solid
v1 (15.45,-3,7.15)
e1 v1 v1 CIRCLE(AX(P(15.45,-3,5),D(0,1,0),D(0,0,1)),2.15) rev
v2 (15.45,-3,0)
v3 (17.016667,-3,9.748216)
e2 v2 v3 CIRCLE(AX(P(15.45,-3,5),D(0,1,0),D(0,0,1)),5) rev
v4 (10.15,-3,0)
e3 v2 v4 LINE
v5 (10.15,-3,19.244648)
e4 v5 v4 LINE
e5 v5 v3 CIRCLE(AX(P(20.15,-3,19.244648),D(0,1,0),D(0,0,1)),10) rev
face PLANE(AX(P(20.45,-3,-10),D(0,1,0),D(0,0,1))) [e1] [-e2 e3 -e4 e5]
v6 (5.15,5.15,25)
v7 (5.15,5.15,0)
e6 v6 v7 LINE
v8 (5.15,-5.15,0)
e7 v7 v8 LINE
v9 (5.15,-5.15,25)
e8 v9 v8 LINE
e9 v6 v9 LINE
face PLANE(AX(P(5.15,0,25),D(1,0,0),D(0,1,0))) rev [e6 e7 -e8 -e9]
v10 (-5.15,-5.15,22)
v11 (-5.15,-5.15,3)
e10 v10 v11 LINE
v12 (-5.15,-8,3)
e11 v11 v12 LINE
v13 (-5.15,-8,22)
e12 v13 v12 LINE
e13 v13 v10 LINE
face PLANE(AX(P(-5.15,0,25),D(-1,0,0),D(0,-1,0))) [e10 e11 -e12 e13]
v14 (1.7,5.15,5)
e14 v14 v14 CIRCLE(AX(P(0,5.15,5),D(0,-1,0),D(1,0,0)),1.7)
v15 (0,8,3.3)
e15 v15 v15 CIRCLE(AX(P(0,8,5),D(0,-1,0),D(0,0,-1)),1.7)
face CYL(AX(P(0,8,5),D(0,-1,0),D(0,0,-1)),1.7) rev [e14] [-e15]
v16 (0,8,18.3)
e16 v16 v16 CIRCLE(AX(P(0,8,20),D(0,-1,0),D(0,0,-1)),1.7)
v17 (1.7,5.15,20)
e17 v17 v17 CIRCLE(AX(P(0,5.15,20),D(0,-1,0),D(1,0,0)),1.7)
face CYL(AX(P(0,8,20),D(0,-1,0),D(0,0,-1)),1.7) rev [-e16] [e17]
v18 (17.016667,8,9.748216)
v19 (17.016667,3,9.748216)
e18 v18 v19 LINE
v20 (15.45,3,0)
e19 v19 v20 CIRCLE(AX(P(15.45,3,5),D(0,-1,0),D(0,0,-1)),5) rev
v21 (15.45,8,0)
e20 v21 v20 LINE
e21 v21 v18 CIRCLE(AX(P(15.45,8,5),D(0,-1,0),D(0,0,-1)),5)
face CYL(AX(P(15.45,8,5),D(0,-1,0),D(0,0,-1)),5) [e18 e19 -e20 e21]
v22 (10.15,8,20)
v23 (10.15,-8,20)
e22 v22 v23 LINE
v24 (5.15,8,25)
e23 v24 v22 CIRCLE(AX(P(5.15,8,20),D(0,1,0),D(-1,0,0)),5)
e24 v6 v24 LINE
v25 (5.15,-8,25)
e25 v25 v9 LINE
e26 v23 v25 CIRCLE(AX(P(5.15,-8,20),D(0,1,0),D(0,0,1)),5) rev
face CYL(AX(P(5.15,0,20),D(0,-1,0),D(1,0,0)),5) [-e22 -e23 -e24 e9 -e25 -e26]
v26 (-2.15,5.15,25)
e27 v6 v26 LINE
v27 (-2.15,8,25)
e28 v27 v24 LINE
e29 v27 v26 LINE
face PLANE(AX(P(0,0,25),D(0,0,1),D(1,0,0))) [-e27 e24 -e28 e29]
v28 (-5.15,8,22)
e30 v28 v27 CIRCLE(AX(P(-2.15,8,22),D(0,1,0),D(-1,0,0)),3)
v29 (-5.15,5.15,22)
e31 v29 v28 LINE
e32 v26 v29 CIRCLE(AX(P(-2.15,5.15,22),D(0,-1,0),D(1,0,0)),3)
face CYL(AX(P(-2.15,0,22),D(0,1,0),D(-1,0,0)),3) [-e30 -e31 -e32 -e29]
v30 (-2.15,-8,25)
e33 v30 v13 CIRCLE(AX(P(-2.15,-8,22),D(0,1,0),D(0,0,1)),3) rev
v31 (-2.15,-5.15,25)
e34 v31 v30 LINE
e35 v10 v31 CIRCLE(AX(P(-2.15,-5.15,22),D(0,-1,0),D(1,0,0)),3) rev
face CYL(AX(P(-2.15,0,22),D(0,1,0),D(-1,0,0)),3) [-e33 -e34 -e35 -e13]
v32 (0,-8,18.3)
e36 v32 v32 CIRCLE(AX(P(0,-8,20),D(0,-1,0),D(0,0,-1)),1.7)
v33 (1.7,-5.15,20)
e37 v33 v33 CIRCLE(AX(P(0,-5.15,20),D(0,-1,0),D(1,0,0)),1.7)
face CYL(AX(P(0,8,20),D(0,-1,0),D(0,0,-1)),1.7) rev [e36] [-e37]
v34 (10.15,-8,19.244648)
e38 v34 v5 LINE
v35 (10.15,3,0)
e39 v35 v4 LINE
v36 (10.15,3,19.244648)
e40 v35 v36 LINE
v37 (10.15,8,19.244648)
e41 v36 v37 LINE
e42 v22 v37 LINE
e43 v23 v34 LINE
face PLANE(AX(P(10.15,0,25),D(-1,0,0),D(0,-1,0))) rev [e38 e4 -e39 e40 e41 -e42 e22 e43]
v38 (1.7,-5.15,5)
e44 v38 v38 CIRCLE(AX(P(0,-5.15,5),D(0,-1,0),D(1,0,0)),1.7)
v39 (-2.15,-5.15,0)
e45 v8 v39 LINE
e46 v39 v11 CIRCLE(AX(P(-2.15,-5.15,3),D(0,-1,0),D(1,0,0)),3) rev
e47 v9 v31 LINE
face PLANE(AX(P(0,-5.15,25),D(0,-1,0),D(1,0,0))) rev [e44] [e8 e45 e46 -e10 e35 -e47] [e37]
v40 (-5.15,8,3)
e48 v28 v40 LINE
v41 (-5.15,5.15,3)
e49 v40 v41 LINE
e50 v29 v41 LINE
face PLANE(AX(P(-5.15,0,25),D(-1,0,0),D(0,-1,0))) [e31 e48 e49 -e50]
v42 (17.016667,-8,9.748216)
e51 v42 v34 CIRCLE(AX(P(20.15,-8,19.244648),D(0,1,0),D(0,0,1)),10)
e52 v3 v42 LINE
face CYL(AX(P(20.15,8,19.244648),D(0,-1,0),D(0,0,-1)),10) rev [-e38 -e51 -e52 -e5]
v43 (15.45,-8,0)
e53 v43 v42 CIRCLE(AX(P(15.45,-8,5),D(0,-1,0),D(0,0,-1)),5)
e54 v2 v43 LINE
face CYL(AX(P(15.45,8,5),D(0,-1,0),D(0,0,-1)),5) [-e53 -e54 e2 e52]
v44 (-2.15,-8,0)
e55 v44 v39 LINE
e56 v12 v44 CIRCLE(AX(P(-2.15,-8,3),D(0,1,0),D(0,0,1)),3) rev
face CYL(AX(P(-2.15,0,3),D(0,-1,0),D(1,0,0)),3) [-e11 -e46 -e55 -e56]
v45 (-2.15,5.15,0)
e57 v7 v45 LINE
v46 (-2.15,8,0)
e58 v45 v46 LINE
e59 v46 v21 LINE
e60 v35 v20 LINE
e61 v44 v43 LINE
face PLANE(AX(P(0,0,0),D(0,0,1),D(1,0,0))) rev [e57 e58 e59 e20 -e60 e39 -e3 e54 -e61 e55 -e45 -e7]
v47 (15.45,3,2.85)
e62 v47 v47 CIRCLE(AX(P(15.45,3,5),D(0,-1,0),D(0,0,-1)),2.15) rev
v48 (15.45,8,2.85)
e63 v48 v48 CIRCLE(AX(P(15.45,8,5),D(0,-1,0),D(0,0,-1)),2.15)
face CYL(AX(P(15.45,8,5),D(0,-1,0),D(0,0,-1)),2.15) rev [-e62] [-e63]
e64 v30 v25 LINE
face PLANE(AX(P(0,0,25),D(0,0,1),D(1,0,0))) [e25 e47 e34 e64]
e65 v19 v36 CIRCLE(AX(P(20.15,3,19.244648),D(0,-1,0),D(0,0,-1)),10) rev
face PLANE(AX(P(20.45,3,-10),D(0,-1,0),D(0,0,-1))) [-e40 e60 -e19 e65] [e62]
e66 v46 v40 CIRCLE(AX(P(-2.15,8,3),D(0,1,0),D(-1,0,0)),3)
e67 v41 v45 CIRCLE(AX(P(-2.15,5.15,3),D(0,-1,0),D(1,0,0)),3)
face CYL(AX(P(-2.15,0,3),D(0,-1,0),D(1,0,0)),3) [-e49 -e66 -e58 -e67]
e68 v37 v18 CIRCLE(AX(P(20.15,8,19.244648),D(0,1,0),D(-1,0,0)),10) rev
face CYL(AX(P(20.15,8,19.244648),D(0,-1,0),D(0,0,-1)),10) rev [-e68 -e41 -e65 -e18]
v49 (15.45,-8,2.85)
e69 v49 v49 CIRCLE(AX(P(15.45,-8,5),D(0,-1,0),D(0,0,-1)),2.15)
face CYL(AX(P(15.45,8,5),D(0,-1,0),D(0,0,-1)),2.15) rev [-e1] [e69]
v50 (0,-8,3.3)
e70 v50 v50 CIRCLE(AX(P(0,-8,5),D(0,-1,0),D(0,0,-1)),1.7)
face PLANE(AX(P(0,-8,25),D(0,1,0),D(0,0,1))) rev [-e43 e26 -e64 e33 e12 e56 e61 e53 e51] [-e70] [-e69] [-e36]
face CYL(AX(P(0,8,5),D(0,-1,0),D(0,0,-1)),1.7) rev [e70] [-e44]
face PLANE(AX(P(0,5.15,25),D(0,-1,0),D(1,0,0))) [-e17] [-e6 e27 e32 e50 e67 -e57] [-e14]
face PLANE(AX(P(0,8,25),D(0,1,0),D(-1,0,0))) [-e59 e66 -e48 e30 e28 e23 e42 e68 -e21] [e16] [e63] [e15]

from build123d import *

# Parameters (mm, degrees)
EXTRUDE_1_DEPTH     = 25
SKETCH_2_R          = 1.7
CUT_EXTRUDE_1_DEPTH = 32.369132918
SKETCH_3_R          = 2.15
EXTRUDE_2_DEPTH     = 16
SKETCH_4_W          = 20
SKETCH_4_H          = 6
CUT_EXTRUDE_2_DEPTH = 31.382396219
FILLET_1_R          = 10
FILLET_2_R          = 5
FILLET_3_R          = 3


# Some blends are built 0.0001 mm under size
with BuildPart() as part:
    # ｽｹｯﾁ1 → ﾎﾞｽ - 押し出し1 (new body)
    with BuildSketch(Plane.XY):
        Polygon((5.15, 0), (10.15, 0), (10.15, 8), (-5.15, 8), (-5.15, 5.15), (5.15, 5.15), align=None)
        Polygon((10.15, -8), (10.15, 0), (5.15, 0), (5.15, -5.15), (-5.15, -5.15), (-5.15, -8), align=None)
    extrude(amount=EXTRUDE_1_DEPTH)

    # ｽｹｯﾁ2 → ｶｯﾄ - 押し出し1 (cut, through all)
    with BuildSketch(Plane.XZ.offset(8)):
        with Locations(Location((0, 20, 0), (0, 0, 270))):
            Circle(SKETCH_2_R)
        with Locations(Location((0, 5, 0), (0, 0, 270))):
            Circle(SKETCH_2_R)
    extrude(amount=-CUT_EXTRUDE_1_DEPTH, mode=Mode.SUBTRACT)

    # ｽｹｯﾁ3 → ﾎﾞｽ - 押し出し2 (add, through all)
    with BuildSketch(Plane.XZ.offset(8)):
        with BuildLine():
            Line((10.15, 0), (15.45, 0))
            ThreePointArc((15.45, 0), (20.45, 5), (15.45, 10))
            Line((15.45, 10), (10.15, 10))
            Line((10.15, 10), (10.15, 0))
        make_face()
        with Locations(Location((15.45, 5, 0), (0, 0, 270))):
            Circle(SKETCH_3_R, mode=Mode.SUBTRACT)
    extrude(amount=-EXTRUDE_2_DEPTH)

    # ｽｹｯﾁ4 → ｶｯﾄ - 押し出し2 (cut, through all)
    with BuildSketch(Plane(origin=(10.15, 0, 0), x_dir=(0, 0, -1), z_dir=(1, 0, 0))):
        Rectangle(SKETCH_4_W, SKETCH_4_H)
    extrude(amount=CUT_EXTRUDE_2_DEPTH, mode=Mode.SUBTRACT)

    # ﾌｨﾚｯﾄ1
    # the kernel refuses this fillet: 10 mm, written as the material it adds along each edge
    with BuildSketch(Plane(origin=(10.15, -8, 10), x_dir=(0, 0, 1), z_dir=(0, 1, 0)), Plane(origin=(10.15, 3, 10), x_dir=(0, 0, 1), z_dir=(0, 1, 0))) as fillet_1_piece_1:
        with BuildLine():
            CenterArc((9.244648118, 10), FILLET_1_R, 198.260227933, 71.739772067)
            Line((-0.251783961, 6.866666667), (-1.201427169, 6.553333333))
            ThreePointArc((-1.201427169, 6.553333333), (-1, 5.3), (-1, 0))
            Line((-1, 0), (0, -1))
            Line((0, -1), (9.244648118, -1))
            Line((9.244648118, -1), (9.244648118, 0))
        make_face()
    extrude(amount=5)
    with BuildSketch(Plane(origin=(10.15, -8, 10), x_dir=(0, 0, 1), z_dir=(0, 1, 0))) as fillet_1_piece_2_section:
        with BuildLine():
            CenterArc((9.244648118, 10), FILLET_1_R, 198.260227933, 71.739772067)
            Line((-0.251783961, 6.866666667), (-1.201427169, 6.553333333))
            ThreePointArc((-1.201427169, 6.553333333), (-1, 5.3), (-1, 0))
            Line((-1, 0), (0, -1))
            Line((0, -1), (9.244648118, -1))
            Line((9.244648118, -1), (9.244648118, 0))
        make_face()
    fillet_1_piece_2 = extrude(amount=28.111620295, mode=Mode.PRIVATE)
    fillet_1_piece_2 = split(fillet_1_piece_2, bisect_by=Plane(origin=(11.517519747, 8, 12.315903655), z_dir=(0, -1, 0)), keep=Keep.TOP, mode=Mode.PRIVATE)
    fillet_1_piece_2 = split(fillet_1_piece_2, bisect_by=Plane(origin=(11.517519747, 3, 12.315903655), z_dir=(0, 1, 0)), keep=Keep.TOP, mode=Mode.PRIVATE)
    add(fillet_1_piece_2)
    with BuildSketch(Plane(origin=(10.15, -20.111620295, 10), x_dir=(0, 0, 1), z_dir=(0, 1, 0))) as fillet_1_piece_3_section:
        with BuildLine():
            CenterArc((9.244648118, 10), FILLET_1_R, 198.260227933, 71.739772067)
            Line((-0.251783961, 6.866666667), (-1.201427169, 6.553333333))
            ThreePointArc((-1.201427169, 6.553333333), (-1, 5.3), (-1, 0))
            Line((-1, 0), (0, -1))
            Line((0, -1), (9.244648118, -1))
            Line((9.244648118, -1), (9.244648118, 0))
        make_face()
    fillet_1_piece_3 = extrude(amount=28.111620295, mode=Mode.PRIVATE)
    fillet_1_piece_3 = split(fillet_1_piece_3, bisect_by=Plane(origin=(11.517519747, -8, 12.315903655), z_dir=(0, 1, 0)), keep=Keep.TOP, mode=Mode.PRIVATE)
    fillet_1_piece_3 = split(fillet_1_piece_3, bisect_by=Plane(origin=(11.517519747, -3, 12.315903655), z_dir=(0, -1, 0)), keep=Keep.TOP, mode=Mode.PRIVATE)
    add(fillet_1_piece_3)

    # ﾌｨﾚｯﾄ2
    fillet_2_edges = [part.edges().sort_by_distance(p)[0] for p in [
        (10.15, 0, 25),
    ]]
    fillet(fillet_2_edges, radius=FILLET_2_R - 0.0001)  # a hair under: the kernel refuses the full size

    # ﾌｨﾚｯﾄ3
    fillet_3_edges = [part.edges().sort_by_distance(p)[0] for p in [
        (-5.15, 6.575, 0),
        (-5.15, -6.575, 0),
        (-5.15, -6.575, 25),
        (-5.15, 6.575, 25),
    ]]
    fillet(fillet_3_edges, radius=FILLET_3_R)


solid = part.part
